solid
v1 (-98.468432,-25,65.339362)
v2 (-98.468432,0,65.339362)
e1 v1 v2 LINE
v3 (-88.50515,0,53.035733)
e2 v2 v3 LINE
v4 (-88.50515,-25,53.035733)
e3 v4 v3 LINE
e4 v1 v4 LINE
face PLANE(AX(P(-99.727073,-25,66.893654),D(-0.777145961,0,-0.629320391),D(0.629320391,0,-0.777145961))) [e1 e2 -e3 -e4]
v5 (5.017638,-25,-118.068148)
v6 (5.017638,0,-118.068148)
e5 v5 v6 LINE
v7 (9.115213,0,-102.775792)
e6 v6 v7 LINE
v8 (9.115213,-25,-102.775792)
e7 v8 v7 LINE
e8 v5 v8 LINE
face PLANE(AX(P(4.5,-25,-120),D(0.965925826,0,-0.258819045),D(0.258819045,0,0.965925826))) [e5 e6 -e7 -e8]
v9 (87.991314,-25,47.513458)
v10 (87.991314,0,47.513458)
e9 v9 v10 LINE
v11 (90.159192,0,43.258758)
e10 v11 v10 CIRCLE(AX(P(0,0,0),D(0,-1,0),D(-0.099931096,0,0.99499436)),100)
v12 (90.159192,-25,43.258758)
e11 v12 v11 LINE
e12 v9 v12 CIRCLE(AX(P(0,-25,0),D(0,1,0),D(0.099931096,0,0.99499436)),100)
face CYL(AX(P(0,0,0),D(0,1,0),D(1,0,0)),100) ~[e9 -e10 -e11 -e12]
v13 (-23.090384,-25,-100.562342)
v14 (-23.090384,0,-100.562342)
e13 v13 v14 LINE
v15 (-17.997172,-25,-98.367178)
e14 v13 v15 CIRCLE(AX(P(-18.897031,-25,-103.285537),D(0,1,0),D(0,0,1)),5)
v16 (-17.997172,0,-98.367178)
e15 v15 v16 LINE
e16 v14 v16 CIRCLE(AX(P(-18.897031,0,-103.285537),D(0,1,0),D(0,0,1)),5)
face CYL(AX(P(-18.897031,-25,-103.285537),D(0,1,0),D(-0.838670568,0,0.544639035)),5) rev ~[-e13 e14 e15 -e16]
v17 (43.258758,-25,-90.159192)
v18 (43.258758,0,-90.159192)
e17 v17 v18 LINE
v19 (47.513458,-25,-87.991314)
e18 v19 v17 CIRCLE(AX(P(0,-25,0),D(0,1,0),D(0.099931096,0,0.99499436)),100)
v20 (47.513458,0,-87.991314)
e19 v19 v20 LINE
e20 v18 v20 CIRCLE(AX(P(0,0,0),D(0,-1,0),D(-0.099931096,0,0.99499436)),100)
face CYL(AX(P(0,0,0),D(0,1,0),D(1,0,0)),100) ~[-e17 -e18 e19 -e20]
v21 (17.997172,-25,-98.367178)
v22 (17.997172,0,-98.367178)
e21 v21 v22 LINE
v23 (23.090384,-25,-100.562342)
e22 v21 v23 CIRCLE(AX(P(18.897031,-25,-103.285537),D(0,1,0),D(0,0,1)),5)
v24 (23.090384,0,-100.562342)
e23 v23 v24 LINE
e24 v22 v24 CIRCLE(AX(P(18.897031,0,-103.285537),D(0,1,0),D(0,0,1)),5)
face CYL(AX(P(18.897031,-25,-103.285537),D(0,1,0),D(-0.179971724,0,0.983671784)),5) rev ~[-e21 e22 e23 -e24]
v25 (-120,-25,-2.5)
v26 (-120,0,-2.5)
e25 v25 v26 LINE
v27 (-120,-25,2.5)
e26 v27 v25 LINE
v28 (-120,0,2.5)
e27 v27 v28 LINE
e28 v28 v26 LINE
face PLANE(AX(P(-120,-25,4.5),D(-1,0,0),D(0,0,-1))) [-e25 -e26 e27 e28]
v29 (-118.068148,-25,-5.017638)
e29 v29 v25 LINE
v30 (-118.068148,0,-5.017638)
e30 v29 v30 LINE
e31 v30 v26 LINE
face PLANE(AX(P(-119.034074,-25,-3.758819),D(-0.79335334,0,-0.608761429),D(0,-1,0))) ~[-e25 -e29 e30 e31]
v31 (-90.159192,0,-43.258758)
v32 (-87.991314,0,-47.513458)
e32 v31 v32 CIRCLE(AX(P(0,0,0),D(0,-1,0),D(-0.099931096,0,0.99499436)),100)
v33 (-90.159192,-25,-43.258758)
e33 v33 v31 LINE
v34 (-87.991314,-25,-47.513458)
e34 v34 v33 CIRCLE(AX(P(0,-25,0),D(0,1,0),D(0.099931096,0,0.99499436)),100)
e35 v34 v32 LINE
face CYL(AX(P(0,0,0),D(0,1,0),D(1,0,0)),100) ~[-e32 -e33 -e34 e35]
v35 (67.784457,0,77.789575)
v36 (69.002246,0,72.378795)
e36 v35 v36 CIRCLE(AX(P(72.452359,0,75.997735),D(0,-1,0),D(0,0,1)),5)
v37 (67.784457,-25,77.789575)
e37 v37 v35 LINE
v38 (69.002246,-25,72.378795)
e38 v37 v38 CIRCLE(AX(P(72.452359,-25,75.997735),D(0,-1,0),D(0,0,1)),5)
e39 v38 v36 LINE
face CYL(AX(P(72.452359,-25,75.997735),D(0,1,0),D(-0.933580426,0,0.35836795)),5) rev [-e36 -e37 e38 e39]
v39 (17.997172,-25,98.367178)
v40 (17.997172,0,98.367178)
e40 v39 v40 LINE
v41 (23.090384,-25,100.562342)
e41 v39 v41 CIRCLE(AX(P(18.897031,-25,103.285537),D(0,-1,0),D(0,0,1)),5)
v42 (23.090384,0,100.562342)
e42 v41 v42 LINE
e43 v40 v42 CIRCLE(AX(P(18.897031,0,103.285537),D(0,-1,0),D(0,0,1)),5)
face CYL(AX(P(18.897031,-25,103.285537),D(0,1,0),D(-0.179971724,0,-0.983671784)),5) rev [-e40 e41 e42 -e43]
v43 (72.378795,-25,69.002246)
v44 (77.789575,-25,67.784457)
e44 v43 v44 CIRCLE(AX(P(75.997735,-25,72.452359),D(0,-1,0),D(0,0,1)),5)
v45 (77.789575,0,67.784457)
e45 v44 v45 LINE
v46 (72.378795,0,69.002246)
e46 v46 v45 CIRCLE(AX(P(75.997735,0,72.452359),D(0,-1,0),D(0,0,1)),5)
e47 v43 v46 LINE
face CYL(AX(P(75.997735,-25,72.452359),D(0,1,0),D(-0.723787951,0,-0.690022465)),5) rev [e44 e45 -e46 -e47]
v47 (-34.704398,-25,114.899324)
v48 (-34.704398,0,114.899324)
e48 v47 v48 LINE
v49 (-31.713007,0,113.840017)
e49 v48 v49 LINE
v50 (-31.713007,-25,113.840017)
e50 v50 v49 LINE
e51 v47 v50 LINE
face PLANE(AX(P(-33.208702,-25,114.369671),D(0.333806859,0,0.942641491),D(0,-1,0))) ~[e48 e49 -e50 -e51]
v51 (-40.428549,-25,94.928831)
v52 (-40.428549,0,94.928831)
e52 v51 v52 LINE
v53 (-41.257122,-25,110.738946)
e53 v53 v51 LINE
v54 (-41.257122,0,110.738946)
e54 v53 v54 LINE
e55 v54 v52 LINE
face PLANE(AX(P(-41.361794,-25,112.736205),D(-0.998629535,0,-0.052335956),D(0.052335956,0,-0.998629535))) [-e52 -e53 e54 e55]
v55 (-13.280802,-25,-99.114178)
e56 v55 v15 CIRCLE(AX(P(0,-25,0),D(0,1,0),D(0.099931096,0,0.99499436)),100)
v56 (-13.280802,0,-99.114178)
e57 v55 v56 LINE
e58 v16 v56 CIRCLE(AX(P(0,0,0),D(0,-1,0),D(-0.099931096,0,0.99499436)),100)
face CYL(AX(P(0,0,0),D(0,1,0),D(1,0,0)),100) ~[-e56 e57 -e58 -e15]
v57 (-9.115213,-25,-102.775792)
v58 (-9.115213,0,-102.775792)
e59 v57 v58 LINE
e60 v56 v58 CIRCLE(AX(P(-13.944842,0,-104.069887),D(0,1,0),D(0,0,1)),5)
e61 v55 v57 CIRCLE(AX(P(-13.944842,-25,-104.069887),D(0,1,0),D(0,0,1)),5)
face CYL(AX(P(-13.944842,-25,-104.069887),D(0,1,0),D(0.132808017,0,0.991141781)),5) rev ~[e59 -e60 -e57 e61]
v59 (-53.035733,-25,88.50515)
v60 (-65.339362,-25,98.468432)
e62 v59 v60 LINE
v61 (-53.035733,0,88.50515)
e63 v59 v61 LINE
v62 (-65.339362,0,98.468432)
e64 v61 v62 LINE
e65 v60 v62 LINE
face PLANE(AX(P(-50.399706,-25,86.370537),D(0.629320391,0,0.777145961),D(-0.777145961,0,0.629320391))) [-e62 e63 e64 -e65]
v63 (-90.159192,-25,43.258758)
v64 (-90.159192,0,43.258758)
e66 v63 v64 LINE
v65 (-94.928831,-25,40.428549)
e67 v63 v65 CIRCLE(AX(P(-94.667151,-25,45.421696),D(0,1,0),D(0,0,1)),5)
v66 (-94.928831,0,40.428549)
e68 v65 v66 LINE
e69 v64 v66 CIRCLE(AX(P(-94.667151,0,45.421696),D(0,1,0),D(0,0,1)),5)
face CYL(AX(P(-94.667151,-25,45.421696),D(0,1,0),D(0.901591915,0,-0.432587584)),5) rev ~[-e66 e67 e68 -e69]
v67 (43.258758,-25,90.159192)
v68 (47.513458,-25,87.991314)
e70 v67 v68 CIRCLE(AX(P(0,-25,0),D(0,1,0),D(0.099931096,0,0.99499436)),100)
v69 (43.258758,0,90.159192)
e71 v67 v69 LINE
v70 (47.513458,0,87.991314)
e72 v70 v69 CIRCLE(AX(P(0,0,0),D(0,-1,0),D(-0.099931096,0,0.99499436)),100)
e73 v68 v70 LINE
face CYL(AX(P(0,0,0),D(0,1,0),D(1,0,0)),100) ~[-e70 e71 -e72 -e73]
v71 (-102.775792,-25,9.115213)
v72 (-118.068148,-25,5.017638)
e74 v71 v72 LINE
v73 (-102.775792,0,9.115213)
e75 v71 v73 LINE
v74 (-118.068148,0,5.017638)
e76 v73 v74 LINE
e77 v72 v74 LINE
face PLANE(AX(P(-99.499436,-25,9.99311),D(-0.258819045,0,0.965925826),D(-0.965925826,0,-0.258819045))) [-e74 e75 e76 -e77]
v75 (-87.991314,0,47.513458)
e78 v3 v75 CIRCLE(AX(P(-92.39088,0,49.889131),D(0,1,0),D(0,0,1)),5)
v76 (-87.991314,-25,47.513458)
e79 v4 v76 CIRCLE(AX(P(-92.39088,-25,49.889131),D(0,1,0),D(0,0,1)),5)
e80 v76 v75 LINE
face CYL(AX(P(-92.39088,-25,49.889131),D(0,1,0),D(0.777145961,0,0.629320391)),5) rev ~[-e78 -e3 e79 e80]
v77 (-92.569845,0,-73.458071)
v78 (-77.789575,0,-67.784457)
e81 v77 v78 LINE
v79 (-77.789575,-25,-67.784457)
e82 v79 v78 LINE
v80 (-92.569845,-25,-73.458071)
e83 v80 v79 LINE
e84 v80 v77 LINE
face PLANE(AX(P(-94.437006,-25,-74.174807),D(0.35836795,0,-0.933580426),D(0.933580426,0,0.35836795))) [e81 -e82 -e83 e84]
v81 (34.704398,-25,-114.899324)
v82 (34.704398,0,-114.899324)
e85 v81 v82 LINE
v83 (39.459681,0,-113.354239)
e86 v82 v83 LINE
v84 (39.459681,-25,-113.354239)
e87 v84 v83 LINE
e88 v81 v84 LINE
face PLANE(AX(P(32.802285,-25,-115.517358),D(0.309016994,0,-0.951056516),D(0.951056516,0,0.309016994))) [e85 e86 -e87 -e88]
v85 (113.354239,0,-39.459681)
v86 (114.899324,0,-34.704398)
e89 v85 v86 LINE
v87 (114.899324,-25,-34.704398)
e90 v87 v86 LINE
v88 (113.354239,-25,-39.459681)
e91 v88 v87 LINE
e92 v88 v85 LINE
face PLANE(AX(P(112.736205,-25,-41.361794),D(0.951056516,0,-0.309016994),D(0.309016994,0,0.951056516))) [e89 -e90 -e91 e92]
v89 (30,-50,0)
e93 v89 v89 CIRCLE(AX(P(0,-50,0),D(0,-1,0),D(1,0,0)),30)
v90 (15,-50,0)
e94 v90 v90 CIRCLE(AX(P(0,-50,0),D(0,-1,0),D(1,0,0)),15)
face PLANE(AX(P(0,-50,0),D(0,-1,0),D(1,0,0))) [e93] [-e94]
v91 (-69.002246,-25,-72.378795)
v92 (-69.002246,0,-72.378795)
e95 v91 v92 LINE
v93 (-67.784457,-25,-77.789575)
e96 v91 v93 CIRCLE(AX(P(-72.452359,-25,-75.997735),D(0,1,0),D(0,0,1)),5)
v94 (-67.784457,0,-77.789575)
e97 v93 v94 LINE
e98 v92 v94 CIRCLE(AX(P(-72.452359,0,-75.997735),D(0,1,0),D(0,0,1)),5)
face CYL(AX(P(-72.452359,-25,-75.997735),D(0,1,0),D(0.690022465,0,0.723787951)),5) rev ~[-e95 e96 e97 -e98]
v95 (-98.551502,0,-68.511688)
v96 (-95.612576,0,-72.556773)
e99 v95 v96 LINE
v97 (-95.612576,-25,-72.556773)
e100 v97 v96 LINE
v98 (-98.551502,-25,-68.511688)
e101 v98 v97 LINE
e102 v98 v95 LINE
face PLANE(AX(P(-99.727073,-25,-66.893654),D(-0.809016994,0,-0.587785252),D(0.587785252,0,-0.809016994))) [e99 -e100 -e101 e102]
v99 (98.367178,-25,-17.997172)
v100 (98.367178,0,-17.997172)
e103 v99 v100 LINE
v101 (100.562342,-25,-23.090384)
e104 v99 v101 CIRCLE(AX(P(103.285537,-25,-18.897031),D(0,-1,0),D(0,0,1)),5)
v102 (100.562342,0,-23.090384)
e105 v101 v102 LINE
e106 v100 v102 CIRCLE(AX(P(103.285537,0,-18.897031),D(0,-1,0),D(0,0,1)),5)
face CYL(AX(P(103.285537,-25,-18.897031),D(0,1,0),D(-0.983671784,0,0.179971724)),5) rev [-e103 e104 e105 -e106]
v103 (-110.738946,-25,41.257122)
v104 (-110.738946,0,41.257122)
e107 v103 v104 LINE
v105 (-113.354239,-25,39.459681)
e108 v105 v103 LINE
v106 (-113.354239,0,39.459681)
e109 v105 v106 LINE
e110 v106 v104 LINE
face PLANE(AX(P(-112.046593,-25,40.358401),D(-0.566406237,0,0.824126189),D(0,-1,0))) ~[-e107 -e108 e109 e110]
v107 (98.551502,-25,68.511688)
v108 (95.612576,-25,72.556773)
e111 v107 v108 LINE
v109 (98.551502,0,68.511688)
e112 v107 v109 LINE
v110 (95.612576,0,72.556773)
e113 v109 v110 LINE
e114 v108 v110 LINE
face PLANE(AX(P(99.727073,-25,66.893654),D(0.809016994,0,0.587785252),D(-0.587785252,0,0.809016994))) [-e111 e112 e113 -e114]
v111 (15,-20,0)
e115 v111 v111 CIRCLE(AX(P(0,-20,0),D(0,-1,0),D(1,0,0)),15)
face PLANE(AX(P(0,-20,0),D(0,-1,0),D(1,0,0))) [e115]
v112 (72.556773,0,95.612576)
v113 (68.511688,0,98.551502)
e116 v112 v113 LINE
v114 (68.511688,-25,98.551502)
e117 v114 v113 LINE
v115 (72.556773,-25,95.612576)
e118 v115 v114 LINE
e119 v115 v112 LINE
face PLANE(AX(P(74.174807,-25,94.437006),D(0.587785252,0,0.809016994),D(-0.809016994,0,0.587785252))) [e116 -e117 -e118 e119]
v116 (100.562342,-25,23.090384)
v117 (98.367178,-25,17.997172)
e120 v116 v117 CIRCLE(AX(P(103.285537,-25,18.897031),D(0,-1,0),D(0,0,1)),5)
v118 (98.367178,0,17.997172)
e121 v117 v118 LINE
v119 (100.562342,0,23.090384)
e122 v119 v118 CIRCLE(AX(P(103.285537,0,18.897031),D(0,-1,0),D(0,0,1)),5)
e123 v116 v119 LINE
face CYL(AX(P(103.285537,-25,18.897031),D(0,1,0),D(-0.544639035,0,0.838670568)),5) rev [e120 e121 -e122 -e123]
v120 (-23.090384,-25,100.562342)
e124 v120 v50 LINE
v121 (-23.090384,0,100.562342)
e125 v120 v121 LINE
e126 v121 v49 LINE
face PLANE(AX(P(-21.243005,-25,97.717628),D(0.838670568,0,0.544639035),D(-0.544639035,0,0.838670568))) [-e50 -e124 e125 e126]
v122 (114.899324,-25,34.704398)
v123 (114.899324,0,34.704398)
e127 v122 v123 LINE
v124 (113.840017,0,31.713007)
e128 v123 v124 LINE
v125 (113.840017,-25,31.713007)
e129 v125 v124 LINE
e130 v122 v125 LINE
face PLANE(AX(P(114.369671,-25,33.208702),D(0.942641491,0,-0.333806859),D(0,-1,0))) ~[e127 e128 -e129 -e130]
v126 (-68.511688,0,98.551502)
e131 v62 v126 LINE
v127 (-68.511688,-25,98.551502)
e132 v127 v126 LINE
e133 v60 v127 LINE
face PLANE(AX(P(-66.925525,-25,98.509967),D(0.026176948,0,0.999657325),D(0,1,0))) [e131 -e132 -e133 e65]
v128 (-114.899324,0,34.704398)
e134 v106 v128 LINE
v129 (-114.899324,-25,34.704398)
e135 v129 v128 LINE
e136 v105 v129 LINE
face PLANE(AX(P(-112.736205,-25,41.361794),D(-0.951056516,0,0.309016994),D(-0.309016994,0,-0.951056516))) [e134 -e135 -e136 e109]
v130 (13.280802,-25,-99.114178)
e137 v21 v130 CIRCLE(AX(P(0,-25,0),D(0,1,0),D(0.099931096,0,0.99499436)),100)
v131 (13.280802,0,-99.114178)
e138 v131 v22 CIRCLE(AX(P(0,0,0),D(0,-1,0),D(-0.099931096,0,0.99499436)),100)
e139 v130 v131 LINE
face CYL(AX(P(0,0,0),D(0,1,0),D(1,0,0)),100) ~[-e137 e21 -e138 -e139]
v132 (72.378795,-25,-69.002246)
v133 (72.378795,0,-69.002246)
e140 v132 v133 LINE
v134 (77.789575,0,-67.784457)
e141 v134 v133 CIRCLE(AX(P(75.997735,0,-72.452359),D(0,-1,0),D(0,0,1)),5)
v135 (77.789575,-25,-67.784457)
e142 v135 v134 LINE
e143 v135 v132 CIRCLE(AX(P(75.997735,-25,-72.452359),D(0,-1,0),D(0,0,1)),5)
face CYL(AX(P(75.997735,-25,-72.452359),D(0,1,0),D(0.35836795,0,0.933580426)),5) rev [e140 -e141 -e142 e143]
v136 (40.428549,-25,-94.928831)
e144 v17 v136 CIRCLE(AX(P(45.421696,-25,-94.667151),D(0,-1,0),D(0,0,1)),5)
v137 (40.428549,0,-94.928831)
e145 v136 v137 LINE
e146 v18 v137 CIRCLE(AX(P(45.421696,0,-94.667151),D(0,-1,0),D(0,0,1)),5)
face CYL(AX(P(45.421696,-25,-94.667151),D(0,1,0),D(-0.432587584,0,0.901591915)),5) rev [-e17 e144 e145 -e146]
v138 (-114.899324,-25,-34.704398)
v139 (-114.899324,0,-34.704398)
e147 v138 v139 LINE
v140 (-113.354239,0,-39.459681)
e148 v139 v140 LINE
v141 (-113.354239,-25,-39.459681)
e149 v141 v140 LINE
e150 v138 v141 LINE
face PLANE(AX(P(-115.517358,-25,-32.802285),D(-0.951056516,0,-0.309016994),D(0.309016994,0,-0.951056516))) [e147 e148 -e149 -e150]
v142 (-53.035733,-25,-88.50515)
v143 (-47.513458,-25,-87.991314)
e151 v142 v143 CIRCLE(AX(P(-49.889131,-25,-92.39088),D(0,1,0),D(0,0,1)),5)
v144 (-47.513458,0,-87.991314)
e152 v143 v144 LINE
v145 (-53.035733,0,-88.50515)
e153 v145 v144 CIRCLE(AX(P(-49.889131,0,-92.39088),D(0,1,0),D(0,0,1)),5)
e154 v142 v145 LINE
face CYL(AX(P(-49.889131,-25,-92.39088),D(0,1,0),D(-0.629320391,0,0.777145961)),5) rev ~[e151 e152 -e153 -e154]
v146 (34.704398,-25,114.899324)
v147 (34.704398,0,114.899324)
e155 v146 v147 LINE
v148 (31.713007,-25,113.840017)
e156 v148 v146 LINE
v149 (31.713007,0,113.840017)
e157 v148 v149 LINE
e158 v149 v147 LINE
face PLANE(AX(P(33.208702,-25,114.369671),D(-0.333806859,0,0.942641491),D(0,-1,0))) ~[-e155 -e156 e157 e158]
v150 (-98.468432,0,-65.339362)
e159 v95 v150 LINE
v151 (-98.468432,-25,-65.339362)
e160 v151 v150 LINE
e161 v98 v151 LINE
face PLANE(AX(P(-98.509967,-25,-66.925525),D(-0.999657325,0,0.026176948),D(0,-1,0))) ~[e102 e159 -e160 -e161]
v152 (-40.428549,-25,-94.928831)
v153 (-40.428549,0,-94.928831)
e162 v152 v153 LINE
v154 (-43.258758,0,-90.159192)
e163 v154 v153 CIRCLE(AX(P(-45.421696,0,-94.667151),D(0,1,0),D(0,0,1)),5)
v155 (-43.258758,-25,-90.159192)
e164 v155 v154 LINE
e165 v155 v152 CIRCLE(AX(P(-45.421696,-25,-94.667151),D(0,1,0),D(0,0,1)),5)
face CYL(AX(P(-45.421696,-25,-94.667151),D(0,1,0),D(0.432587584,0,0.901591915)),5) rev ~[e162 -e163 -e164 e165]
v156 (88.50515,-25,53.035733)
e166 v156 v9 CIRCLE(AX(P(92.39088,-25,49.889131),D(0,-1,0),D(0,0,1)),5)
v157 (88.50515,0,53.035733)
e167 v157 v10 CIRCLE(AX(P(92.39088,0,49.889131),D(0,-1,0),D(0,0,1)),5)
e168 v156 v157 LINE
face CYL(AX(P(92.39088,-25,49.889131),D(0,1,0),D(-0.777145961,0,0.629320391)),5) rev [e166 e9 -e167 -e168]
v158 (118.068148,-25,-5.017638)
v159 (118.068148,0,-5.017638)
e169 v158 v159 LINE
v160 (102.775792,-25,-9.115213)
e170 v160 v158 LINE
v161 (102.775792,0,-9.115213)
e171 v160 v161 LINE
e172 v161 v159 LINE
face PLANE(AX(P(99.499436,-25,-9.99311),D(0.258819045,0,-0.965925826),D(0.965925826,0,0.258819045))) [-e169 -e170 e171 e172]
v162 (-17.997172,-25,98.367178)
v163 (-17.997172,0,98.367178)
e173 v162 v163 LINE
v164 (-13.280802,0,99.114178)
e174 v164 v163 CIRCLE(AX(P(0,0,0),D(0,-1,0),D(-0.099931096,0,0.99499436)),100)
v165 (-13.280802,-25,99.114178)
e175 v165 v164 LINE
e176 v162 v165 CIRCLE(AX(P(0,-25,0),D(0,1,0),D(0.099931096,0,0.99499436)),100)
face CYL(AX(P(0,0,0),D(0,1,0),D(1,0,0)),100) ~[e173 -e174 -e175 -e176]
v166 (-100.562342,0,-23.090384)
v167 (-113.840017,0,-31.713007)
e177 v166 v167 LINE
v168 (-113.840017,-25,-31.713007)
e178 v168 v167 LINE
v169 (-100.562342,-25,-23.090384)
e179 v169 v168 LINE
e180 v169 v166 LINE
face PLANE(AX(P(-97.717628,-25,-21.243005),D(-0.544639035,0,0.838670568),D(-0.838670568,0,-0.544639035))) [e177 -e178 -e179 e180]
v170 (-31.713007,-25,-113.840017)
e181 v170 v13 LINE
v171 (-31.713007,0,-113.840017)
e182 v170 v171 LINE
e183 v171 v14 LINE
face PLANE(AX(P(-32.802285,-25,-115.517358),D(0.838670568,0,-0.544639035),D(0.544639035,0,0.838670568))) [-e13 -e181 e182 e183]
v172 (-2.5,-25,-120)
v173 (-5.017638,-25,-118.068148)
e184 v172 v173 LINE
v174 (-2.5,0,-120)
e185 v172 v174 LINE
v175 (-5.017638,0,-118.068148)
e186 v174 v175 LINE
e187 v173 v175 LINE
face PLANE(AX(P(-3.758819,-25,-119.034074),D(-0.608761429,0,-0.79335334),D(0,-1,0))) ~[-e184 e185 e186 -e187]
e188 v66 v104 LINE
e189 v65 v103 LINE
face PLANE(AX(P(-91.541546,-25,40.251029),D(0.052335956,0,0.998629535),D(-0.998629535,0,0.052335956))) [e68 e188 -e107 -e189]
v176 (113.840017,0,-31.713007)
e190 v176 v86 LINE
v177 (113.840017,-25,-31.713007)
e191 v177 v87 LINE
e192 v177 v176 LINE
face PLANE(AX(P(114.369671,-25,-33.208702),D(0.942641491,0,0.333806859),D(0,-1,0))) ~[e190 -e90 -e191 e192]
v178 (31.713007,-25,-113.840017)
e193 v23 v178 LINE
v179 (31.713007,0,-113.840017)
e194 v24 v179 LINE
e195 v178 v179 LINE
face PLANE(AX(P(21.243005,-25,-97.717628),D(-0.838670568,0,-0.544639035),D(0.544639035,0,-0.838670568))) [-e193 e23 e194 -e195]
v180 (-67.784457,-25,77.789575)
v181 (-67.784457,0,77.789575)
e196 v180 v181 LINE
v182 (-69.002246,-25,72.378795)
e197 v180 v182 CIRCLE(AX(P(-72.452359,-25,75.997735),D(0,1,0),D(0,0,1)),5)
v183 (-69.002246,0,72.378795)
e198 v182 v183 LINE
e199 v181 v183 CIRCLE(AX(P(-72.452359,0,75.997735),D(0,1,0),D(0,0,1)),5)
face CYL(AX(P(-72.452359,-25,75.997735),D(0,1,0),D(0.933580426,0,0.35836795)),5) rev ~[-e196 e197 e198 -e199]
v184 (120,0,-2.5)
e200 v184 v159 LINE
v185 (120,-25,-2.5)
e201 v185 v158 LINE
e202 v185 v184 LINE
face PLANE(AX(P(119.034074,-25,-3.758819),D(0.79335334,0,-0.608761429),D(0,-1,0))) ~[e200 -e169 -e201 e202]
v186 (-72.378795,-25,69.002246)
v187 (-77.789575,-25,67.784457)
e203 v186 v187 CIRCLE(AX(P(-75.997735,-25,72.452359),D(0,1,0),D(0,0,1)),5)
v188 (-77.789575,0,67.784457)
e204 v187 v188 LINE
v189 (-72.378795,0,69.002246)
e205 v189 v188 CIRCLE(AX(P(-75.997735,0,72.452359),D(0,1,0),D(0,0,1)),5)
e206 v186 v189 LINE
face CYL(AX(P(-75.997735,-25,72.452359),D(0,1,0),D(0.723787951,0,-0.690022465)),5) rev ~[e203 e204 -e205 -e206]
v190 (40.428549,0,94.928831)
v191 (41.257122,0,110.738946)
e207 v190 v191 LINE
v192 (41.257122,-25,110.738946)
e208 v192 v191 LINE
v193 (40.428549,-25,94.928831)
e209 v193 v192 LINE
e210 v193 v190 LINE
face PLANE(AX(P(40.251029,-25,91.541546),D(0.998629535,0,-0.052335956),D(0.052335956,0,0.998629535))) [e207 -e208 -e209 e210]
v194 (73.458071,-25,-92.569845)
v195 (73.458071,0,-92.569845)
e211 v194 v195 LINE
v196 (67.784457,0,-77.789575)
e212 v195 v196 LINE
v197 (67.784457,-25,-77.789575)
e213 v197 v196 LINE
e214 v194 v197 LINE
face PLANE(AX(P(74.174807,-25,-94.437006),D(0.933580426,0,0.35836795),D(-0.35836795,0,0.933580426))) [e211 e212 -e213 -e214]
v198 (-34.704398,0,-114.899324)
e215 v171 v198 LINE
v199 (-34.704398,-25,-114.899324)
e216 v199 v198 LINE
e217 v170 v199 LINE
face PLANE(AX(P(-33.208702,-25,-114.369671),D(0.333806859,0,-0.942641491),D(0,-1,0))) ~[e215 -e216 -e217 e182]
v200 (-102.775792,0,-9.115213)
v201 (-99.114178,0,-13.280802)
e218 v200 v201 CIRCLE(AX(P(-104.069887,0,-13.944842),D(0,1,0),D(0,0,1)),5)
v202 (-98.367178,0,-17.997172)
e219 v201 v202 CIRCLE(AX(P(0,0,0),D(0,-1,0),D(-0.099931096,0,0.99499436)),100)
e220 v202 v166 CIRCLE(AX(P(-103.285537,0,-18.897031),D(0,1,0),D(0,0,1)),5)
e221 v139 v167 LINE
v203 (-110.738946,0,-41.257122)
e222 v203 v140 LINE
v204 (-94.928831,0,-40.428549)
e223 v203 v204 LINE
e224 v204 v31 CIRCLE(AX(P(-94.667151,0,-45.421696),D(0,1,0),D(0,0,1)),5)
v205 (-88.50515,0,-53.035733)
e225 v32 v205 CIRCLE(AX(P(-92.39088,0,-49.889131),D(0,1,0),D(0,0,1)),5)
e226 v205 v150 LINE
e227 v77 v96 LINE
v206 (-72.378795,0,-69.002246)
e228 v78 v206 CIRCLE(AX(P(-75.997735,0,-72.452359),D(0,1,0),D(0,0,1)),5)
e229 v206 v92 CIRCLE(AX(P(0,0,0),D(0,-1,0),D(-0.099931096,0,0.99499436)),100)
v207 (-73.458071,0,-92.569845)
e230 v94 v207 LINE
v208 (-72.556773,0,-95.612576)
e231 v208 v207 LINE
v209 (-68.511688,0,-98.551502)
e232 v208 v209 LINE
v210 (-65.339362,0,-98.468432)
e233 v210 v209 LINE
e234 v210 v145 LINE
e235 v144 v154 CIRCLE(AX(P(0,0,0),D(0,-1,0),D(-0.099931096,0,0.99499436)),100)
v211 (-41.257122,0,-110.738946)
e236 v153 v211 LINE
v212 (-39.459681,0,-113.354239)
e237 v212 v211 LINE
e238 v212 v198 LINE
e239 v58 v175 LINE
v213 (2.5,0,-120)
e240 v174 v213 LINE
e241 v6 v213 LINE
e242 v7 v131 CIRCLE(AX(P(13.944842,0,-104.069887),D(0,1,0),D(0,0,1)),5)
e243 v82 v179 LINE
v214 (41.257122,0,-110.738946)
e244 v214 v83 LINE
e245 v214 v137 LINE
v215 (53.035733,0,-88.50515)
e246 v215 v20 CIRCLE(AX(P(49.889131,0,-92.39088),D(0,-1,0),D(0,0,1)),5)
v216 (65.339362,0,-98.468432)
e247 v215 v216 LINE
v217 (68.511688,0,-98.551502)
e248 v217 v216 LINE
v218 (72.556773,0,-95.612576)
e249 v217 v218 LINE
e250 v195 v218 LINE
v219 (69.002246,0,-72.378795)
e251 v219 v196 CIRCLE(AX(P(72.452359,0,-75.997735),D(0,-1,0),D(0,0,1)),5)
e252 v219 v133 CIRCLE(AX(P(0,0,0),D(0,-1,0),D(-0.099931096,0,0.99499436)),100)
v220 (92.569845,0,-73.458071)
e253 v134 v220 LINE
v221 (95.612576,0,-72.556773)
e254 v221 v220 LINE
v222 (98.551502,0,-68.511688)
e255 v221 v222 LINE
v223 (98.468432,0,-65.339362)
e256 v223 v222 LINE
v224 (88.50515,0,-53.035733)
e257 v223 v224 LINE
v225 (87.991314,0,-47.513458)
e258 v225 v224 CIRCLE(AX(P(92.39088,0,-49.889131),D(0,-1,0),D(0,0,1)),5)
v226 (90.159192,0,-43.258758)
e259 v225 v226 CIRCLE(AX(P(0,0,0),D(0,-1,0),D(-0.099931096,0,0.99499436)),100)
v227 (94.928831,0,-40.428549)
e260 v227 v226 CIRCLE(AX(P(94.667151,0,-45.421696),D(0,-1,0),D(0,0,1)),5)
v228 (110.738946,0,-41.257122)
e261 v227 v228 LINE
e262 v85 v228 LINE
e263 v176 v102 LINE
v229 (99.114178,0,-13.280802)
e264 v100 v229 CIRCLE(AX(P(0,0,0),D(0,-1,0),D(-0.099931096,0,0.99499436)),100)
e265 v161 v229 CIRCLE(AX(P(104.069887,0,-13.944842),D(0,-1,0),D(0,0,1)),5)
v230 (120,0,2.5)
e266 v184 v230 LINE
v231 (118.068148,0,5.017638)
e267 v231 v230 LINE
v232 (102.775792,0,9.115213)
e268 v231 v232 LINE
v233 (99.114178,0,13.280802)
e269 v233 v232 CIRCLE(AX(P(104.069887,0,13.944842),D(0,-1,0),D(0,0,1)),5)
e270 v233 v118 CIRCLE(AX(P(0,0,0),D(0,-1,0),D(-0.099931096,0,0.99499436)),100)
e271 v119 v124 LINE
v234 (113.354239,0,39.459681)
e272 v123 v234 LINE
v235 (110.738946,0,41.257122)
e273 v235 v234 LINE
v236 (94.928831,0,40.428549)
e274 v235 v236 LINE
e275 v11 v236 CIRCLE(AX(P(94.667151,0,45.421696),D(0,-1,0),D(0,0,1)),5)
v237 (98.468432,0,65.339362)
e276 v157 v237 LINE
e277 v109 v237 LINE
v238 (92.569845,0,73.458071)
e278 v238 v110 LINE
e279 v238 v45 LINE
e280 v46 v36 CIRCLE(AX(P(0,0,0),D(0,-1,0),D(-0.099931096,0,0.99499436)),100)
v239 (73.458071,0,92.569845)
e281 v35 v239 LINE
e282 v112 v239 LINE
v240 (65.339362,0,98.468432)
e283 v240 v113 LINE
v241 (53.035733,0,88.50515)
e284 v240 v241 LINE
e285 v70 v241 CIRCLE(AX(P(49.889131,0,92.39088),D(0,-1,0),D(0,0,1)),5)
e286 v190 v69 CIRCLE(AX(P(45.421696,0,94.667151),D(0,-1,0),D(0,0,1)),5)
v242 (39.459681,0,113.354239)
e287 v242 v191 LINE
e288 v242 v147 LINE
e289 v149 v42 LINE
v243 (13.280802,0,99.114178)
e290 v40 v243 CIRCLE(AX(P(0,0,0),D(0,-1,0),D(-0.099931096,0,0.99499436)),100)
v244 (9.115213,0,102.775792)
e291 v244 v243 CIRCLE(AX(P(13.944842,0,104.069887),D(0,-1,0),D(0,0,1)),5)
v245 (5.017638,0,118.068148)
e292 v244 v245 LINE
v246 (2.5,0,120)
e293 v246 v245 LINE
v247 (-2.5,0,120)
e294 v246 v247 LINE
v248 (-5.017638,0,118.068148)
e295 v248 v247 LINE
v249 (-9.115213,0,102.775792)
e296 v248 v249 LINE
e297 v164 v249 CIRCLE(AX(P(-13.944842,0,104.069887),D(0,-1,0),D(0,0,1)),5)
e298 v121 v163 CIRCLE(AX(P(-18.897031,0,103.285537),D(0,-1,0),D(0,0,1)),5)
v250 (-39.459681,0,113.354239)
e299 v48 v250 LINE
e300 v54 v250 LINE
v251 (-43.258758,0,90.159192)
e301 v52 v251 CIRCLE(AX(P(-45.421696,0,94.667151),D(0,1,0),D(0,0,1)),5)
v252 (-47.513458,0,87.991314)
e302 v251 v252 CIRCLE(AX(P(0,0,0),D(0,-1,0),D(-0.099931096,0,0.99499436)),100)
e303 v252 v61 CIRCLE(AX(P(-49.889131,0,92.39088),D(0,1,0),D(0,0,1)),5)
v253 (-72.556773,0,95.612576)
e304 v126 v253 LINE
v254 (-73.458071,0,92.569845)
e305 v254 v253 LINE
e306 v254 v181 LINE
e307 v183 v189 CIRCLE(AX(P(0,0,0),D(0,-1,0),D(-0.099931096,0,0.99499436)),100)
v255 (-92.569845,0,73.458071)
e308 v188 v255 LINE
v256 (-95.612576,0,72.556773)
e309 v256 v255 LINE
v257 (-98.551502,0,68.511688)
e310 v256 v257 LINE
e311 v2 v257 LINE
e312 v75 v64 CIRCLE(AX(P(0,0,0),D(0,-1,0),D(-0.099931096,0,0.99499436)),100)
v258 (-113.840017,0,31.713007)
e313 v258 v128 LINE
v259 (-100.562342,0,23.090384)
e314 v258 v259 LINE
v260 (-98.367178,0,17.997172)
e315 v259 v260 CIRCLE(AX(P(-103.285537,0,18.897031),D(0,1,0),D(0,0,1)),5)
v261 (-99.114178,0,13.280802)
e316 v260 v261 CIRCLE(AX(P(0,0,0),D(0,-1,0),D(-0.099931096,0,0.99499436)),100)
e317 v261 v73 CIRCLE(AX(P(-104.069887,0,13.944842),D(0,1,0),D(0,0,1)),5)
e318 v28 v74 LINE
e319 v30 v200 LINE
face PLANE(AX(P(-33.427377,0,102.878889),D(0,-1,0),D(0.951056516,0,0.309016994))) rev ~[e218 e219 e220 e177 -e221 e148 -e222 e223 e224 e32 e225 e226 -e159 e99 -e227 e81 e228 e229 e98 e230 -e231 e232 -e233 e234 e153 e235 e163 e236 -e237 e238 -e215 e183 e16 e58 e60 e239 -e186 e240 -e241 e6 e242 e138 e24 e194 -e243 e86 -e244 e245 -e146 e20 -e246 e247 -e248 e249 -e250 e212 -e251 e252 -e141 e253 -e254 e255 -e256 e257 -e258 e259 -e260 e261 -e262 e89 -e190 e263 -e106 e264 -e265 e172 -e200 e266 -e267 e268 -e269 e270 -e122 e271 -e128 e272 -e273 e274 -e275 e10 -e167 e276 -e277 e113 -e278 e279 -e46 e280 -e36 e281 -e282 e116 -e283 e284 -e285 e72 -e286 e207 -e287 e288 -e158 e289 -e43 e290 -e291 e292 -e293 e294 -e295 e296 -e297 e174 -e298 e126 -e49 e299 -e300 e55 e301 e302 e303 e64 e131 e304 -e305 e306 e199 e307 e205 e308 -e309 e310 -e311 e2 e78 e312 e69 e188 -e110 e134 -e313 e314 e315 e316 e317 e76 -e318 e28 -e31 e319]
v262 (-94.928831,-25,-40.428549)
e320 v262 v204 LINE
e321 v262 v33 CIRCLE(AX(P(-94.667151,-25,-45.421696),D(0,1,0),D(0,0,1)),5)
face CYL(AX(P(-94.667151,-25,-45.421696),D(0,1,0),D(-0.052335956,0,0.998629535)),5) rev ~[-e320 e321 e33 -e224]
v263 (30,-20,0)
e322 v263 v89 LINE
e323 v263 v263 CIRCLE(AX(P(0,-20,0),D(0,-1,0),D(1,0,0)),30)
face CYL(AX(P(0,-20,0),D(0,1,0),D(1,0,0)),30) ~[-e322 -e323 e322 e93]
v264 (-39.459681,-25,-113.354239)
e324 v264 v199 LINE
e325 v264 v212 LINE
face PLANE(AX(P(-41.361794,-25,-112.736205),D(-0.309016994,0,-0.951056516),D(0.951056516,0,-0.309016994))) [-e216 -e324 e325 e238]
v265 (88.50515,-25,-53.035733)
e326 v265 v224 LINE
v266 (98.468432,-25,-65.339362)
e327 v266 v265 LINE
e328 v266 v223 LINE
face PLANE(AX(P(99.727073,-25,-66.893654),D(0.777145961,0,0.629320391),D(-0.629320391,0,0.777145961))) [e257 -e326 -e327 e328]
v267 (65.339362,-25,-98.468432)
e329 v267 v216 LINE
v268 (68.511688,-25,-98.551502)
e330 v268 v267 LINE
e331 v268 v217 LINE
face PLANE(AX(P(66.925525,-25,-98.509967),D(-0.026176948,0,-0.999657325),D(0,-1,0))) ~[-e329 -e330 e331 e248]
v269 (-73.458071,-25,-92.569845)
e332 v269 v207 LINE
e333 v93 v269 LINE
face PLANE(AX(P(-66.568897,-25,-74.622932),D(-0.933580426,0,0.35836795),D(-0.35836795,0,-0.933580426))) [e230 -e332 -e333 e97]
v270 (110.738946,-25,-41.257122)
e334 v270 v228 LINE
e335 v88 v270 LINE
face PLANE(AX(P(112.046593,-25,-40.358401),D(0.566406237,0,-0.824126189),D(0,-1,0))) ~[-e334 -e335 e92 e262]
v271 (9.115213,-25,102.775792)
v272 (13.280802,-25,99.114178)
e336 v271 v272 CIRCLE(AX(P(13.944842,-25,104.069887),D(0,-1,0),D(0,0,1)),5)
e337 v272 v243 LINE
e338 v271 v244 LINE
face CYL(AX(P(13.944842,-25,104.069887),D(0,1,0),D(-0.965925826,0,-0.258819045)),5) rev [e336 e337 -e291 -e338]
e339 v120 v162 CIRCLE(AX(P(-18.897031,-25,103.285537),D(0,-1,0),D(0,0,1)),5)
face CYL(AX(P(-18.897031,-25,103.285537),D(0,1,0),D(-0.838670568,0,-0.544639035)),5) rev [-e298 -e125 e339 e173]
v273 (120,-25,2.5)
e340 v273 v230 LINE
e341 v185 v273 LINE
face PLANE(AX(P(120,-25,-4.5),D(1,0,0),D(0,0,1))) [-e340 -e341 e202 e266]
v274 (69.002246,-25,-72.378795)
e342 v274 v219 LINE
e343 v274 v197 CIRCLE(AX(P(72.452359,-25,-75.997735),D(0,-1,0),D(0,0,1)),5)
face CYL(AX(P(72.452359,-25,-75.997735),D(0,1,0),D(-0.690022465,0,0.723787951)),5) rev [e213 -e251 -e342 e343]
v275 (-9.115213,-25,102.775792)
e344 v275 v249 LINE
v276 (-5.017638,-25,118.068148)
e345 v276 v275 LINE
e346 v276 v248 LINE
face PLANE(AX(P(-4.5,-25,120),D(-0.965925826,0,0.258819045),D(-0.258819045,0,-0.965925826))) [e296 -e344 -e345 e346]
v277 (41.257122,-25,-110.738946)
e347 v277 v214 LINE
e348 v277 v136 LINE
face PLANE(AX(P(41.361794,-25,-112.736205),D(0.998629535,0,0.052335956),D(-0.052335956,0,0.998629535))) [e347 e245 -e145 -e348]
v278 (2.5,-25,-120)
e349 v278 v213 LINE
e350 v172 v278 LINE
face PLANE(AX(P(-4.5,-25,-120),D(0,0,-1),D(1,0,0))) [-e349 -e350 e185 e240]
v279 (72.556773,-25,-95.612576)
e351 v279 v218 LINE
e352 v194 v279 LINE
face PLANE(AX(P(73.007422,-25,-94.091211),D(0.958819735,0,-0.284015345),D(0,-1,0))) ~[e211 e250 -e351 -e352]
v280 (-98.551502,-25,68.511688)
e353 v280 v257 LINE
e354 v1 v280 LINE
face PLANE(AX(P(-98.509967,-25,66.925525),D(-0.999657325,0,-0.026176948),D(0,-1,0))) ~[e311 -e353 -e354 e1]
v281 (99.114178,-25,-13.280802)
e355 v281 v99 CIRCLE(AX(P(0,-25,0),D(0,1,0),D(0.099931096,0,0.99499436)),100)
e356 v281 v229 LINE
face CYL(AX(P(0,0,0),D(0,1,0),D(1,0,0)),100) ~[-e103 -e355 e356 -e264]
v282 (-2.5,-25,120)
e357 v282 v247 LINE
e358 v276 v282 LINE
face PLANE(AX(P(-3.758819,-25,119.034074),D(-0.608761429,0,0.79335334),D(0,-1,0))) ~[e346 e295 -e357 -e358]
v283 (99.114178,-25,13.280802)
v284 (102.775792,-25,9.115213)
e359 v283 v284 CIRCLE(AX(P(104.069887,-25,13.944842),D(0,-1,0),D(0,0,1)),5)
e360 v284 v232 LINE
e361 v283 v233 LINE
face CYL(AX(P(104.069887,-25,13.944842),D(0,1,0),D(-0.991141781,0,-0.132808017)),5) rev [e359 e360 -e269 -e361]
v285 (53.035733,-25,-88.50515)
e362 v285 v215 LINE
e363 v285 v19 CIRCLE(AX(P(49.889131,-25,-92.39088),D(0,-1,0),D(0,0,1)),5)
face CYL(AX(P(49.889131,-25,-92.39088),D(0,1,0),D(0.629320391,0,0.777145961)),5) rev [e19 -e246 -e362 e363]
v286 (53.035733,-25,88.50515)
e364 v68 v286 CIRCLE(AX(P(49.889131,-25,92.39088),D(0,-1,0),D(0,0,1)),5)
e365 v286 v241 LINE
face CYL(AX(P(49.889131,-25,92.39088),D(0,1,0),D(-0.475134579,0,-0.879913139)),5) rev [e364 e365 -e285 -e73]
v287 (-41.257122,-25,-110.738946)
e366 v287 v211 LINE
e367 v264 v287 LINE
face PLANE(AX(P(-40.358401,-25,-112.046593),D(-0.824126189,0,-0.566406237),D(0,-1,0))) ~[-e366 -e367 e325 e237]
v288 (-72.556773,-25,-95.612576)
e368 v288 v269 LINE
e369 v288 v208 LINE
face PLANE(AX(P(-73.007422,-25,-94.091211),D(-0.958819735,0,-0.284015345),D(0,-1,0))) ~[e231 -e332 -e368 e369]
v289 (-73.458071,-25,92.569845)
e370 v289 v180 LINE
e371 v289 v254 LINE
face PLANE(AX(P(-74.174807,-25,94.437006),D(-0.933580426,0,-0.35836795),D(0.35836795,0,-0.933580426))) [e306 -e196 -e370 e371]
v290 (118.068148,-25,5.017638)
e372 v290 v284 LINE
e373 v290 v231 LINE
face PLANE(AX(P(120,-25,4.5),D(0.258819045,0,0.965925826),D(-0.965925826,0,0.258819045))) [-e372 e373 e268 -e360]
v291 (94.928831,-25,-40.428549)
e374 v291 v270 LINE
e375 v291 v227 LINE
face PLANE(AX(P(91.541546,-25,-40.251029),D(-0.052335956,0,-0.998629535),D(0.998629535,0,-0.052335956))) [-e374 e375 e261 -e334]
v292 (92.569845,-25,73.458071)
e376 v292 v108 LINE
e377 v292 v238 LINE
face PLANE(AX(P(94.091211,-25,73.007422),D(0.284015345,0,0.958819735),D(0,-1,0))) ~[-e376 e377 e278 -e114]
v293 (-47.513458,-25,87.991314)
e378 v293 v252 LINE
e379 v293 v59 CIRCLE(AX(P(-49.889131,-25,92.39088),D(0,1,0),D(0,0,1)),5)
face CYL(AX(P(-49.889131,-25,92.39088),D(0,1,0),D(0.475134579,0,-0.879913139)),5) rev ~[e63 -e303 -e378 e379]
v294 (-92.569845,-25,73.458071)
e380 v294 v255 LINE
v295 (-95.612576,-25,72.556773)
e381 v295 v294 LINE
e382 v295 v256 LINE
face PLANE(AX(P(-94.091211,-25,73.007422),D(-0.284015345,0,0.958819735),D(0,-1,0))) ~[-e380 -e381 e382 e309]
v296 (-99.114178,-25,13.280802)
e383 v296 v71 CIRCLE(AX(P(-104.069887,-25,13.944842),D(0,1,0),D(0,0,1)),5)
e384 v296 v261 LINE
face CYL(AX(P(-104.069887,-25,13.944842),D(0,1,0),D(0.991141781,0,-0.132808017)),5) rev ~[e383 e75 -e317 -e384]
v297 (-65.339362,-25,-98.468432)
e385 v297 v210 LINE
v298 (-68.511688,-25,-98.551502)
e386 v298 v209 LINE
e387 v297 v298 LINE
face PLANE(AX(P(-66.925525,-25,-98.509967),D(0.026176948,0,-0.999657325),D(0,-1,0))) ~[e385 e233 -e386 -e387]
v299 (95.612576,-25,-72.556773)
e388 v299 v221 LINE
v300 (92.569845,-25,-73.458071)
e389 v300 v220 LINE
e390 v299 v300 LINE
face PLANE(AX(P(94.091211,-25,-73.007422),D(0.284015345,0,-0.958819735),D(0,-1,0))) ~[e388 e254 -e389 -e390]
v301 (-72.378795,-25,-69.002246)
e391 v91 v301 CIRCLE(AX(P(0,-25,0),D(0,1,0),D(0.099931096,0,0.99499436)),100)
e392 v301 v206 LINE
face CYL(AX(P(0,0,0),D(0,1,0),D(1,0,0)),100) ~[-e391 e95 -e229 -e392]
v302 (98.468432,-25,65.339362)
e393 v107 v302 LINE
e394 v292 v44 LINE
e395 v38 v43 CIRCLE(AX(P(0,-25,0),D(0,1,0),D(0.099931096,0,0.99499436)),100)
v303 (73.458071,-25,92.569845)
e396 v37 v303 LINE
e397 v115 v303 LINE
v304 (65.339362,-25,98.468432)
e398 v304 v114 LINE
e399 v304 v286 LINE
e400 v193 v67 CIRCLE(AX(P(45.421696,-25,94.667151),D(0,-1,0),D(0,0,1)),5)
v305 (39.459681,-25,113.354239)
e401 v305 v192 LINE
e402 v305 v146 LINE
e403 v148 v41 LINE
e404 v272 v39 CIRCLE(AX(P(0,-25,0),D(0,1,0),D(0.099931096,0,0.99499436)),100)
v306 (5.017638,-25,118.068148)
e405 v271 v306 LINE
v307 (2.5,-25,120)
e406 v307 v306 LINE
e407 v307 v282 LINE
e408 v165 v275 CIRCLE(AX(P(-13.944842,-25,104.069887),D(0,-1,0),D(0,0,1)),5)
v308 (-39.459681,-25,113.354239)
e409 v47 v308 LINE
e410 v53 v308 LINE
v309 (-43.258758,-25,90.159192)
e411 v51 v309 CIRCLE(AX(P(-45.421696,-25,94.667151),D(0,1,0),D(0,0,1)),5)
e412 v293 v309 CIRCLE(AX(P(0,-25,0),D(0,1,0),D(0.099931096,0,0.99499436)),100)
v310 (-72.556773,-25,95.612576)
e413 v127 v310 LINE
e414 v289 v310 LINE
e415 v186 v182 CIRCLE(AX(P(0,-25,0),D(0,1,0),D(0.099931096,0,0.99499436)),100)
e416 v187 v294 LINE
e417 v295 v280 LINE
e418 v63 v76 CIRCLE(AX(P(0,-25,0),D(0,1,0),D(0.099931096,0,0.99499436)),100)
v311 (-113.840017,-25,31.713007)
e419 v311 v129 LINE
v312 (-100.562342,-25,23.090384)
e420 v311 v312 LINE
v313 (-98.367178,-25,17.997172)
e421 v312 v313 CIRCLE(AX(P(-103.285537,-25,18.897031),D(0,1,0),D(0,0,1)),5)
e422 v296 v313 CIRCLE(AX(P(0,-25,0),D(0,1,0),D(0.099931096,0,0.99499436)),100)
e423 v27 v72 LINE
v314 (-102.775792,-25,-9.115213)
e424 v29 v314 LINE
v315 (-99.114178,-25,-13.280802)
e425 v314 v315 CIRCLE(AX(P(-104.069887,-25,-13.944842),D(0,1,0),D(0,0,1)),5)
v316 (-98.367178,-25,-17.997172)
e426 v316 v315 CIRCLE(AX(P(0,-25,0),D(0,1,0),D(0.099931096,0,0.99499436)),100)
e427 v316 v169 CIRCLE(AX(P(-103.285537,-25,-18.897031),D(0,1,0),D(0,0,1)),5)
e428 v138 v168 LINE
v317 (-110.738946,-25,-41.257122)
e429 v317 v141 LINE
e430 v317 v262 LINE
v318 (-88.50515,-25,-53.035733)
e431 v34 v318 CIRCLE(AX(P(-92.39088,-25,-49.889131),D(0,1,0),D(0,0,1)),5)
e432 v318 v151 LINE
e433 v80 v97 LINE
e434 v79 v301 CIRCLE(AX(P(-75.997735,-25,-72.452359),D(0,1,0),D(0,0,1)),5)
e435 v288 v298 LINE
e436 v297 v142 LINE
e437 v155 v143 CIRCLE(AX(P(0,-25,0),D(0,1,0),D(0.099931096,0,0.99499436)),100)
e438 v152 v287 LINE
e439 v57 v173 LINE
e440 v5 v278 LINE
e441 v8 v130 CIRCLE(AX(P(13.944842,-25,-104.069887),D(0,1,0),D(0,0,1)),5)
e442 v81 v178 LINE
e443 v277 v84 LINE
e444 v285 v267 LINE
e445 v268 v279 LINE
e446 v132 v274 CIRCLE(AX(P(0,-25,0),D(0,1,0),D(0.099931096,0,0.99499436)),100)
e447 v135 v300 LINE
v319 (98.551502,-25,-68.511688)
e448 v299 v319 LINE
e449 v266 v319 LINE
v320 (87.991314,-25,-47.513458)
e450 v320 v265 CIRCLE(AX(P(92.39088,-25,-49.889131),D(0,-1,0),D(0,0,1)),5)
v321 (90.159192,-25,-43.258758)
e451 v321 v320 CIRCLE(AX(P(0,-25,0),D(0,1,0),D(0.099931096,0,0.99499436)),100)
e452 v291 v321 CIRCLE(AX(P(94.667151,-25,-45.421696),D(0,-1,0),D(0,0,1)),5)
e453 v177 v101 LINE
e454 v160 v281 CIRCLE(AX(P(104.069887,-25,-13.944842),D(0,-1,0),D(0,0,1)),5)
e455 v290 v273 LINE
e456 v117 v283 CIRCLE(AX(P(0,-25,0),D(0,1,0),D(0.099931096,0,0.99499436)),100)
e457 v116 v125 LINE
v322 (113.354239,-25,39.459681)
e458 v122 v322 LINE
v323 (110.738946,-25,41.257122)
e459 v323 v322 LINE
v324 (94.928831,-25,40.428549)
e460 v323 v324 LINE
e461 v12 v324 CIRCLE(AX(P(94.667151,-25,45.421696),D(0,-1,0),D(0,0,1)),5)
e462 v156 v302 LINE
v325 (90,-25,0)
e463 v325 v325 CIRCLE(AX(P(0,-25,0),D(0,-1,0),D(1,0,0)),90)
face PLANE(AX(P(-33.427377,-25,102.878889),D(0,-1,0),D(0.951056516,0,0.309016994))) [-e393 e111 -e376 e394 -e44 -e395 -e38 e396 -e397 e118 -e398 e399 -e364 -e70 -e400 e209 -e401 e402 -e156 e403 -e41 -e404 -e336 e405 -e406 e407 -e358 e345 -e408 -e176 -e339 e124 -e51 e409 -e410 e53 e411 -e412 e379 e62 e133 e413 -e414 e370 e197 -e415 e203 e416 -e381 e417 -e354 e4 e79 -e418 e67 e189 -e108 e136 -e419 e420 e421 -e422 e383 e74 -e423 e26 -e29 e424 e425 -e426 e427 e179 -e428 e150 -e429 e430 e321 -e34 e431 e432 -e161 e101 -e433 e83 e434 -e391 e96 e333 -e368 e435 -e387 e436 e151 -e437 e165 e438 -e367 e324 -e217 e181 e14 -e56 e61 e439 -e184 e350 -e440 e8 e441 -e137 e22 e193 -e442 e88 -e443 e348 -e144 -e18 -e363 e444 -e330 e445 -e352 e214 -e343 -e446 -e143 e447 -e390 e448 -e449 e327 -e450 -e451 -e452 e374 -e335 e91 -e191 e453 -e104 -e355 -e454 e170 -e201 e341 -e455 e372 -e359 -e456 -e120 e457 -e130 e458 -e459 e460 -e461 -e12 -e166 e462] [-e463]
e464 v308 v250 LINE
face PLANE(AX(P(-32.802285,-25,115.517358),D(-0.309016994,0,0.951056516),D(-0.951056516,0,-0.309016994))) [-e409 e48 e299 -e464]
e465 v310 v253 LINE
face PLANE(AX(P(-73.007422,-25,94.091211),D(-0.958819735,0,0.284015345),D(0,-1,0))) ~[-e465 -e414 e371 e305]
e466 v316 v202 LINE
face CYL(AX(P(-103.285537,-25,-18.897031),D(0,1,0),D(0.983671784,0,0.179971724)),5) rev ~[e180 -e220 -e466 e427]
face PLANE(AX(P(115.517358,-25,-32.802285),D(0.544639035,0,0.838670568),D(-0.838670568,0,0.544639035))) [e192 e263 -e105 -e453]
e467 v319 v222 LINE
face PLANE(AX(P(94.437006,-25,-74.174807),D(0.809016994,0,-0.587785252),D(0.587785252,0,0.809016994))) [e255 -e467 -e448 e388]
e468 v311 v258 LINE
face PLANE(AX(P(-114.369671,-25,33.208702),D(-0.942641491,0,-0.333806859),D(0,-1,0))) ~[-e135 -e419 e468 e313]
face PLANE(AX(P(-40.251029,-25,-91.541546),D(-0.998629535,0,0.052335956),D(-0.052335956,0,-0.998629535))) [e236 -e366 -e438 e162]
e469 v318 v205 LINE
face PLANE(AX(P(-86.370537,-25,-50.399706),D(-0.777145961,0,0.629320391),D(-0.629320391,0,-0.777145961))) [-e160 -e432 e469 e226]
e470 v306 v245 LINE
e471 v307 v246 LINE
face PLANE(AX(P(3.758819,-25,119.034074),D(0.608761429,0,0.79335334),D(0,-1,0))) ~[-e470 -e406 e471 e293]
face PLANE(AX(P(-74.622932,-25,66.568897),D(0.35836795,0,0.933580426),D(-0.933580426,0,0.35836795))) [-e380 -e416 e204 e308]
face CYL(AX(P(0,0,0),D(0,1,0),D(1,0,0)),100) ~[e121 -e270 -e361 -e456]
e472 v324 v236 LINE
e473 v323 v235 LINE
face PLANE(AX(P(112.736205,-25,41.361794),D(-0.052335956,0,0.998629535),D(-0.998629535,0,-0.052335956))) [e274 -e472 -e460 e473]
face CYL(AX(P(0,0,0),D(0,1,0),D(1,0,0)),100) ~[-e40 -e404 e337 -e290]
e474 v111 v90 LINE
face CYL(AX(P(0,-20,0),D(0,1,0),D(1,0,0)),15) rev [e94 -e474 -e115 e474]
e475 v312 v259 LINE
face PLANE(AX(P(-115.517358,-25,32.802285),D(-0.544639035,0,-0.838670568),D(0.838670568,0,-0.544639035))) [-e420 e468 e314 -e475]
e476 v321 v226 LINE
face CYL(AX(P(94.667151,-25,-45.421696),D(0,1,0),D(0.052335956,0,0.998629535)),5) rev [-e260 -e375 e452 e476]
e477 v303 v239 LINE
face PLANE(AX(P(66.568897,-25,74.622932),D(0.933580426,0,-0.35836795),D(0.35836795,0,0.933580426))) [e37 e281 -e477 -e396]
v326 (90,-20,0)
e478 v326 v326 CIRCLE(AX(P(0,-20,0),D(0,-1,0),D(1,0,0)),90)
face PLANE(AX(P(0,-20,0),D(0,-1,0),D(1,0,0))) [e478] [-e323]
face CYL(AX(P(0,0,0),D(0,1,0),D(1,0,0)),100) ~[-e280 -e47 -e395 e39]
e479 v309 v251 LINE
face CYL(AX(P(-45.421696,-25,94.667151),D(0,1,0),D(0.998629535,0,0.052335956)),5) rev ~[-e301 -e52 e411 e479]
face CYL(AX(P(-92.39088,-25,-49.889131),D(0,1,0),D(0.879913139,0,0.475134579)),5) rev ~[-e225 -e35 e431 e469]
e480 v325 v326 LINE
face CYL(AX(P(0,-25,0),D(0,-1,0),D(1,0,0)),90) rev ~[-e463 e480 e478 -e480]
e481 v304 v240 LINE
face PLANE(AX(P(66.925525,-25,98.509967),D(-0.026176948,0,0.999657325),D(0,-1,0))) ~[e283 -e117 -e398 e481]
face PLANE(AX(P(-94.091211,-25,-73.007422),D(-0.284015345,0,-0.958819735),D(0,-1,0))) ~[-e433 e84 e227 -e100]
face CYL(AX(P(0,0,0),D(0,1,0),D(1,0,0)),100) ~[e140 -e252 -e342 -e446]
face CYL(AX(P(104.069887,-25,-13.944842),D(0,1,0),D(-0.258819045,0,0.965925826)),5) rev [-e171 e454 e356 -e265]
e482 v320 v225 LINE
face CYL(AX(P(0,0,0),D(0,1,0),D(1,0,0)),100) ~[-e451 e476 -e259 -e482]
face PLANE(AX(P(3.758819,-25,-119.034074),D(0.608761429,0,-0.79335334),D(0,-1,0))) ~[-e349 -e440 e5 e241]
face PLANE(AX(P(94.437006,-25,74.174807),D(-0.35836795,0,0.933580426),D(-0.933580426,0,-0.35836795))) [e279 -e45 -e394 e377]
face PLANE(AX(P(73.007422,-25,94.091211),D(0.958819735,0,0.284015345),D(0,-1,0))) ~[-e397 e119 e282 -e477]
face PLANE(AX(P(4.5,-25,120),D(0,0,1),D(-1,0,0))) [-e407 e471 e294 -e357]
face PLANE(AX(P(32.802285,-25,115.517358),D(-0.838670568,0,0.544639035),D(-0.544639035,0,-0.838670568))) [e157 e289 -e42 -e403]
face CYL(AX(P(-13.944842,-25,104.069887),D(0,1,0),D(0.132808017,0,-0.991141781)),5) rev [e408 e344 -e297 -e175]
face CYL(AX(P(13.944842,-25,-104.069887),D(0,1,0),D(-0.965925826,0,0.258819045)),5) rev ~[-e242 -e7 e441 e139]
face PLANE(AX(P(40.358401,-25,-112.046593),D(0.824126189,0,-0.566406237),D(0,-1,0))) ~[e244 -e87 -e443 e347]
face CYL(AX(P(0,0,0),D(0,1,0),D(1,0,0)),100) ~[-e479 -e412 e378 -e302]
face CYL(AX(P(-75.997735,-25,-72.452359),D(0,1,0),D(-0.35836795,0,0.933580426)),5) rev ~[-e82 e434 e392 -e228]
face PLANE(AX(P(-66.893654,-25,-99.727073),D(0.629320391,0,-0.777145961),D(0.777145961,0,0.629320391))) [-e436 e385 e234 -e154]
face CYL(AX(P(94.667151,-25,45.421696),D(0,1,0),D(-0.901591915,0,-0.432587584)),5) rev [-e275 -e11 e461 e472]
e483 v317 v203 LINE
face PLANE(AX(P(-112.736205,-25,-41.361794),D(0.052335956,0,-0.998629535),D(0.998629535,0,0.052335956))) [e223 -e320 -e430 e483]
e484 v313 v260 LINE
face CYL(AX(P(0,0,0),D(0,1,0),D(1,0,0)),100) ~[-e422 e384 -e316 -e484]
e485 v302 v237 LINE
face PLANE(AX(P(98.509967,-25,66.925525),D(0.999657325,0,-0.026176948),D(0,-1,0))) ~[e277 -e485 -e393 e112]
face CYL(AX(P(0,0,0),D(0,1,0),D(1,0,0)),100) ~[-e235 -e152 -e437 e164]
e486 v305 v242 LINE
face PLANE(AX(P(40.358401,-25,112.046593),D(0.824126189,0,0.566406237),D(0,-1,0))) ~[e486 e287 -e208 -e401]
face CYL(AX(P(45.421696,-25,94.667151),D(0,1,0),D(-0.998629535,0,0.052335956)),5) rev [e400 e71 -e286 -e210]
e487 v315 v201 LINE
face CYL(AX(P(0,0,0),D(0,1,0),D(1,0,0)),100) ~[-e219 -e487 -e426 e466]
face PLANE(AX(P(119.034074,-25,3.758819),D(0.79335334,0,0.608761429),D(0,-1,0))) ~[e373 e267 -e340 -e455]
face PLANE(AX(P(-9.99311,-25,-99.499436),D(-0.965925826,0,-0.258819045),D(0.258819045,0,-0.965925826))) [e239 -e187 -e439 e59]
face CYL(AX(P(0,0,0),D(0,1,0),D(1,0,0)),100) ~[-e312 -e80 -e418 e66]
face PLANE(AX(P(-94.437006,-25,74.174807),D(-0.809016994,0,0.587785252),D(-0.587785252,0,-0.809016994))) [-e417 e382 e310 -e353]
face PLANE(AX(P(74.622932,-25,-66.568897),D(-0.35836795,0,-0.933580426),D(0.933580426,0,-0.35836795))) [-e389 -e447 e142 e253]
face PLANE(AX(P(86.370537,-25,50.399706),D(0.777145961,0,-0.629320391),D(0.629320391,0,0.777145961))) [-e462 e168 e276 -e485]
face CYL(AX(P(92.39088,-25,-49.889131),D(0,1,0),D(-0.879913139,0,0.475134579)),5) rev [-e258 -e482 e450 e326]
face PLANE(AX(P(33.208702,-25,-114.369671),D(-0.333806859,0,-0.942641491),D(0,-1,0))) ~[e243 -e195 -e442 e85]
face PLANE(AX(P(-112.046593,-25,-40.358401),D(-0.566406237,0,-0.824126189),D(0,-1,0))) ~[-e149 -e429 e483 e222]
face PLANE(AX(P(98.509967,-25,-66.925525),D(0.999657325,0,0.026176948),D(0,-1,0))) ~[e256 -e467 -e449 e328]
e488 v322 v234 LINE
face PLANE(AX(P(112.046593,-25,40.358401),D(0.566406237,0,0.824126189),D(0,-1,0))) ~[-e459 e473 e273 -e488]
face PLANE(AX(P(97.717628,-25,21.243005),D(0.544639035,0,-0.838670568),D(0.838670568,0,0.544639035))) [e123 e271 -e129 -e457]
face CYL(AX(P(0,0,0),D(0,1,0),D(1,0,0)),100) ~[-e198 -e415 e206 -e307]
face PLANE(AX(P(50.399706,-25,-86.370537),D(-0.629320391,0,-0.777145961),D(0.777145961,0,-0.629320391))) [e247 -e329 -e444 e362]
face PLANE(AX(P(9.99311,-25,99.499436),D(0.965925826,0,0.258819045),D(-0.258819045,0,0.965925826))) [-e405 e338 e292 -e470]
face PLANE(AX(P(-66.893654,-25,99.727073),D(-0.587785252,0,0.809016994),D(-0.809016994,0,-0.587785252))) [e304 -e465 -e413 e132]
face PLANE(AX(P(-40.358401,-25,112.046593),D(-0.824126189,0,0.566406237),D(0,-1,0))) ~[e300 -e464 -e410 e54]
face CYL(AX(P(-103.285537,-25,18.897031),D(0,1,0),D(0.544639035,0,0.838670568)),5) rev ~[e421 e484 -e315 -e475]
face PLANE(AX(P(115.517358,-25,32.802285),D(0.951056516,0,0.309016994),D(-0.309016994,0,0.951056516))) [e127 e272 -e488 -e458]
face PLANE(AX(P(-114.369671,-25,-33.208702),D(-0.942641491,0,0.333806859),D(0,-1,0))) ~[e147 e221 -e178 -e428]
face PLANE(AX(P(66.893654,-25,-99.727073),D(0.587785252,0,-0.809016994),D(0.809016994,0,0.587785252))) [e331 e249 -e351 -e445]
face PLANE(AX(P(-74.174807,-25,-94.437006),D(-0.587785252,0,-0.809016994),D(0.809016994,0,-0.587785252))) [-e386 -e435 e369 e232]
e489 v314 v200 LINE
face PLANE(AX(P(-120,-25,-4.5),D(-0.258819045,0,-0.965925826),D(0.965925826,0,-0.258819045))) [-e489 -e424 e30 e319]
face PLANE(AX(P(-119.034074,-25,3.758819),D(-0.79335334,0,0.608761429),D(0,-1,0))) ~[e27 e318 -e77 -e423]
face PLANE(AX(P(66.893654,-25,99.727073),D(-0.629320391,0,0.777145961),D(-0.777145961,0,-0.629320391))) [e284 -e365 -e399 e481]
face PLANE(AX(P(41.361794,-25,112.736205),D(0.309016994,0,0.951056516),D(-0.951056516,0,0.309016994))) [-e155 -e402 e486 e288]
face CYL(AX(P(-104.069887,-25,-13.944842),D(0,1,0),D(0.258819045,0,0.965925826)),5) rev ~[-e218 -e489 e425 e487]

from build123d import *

# Parameters (mm, degrees)
F0_R            = 100
F1_DEPTH        = 25
F3_DEPTH        = 25
F3_COPIES_COUNT = 20
F4_SIZE         = 2
F5_R            = 5
F6_R            = 90
F7_DEPTH        = 5
F8_R            = 30
F8_R_2          = 15
F9_DEPTH        = 30


# Not quite as in the source:
# - a pattern or mirror of a feature is missing from the dataset's text; its kind, count and spacing are read off the source's solid


with BuildPart() as f1:
    # F0 (on Front) → F1 (new body)
    with BuildSketch(Plane.XZ):
        Circle(F0_R)
    extrude(amount=F1_DEPTH)

    # F2 (on face) → F3 (join)
    with BuildSketch(Plane.XZ.offset(25)):
        Polygon((-4.5, 120), (-9.9931095726, 99.4994359837), (9.9931095726, 99.4994359837), (4.5, 120), align=None)
    f3 = extrude(amount=-F3_DEPTH)

    # F3_copies: F3 ×20 about axis
    f3_copies_axis = Axis((0, 0, 0), (0, 1, 0))
    for i in range(1, F3_COPIES_COUNT):
        add(f3.rotate(f3_copies_axis, i * 360 / F3_COPIES_COUNT))

    # F4
    f4_edges = [f1.edges().sort_by_distance(p)[0] for p in [
        (4.5, -12.5, 120),
        (-4.5, -12.5, 120),
        (-32.802285, -12.5, 115.517358),
        (115.517358, -12.5, 32.802285),
        (120, -12.5, 4.5),
        (120, -12.5, -4.5),
        (115.517358, -12.5, -32.802285),
        (112.736205, -12.5, -41.361794),
        (99.727073, -12.5, -66.893654),
        (94.437006, -12.5, -74.174807),
        (74.174807, -12.5, -94.437006),
        (66.893654, -12.5, -99.727073),
        (41.361794, -12.5, -112.736205),
        (32.802285, -12.5, -115.517358),
        (4.5, -12.5, -120),
        (-4.5, -12.5, -120),
        (-32.802285, -12.5, -115.517358),
        (-41.361794, -12.5, -112.736205),
        (-66.893654, -12.5, -99.727073),
        (-74.174807, -12.5, -94.437006),
        (-94.437006, -12.5, -74.174807),
        (-99.727073, -12.5, -66.893654),
        (-112.736205, -12.5, -41.361794),
        (-115.517358, -12.5, -32.802285),
        (-120, -12.5, -4.5),
        (-120, -12.5, 4.5),
        (-115.517358, -12.5, 32.802285),
        (-112.736205, -12.5, 41.361794),
        (-99.727073, -12.5, 66.893654),
        (-94.437006, -12.5, 74.174807),
        (-74.174807, -12.5, 94.437006),
        (-66.893654, -12.5, 99.727073),
        (32.802285, -12.5, 115.517358),
        (41.361794, -12.5, 112.736205),
        (66.893654, -12.5, 99.727073),
        (74.174807, -12.5, 94.437006),
        (94.437006, -12.5, 74.174807),
        (99.727073, -12.5, 66.893654),
        (112.736205, -12.5, 41.361794),
        (-41.361794, -12.5, 112.736205),
    ]]
    chamfer(f4_edges, length=F4_SIZE)

    # F5
    f5_edges = [f1.edges().sort_by_distance(p)[0] for p in [
        (9.99311, -12.5, 99.499436),
        (-9.99311, -12.5, 99.499436),
        (97.717628, -12.5, 21.243005),
        (99.499436, -12.5, 9.99311),
        (91.541546, -12.5, 40.251029),
        (86.370537, -12.5, 50.399706),
        (99.499436, -12.5, -9.99311),
        (97.717628, -12.5, -21.243005),
        (74.622932, -12.5, 66.568897),
        (66.568897, -12.5, 74.622932),
        (91.541546, -12.5, -40.251029),
        (86.370537, -12.5, -50.399706),
        (50.399706, -12.5, 86.370537),
        (40.251029, -12.5, 91.541546),
        (74.622932, -12.5, -66.568897),
        (66.568897, -12.5, -74.622932),
        (21.243005, -12.5, 97.717628),
        (50.399706, -12.5, -86.370537),
        (40.251029, -12.5, -91.541546),
        (-21.243005, -12.5, 97.717628),
        (21.243005, -12.5, -97.717628),
        (9.99311, -12.5, -99.499436),
        (-40.251029, -12.5, 91.541546),
        (-50.399706, -12.5, 86.370537),
        (-9.99311, -12.5, -99.499436),
        (-21.243005, -12.5, -97.717628),
        (-66.568897, -12.5, 74.622932),
        (-74.622932, -12.5, 66.568897),
        (-40.251029, -12.5, -91.541546),
        (-50.399706, -12.5, -86.370537),
        (-86.370537, -12.5, 50.399706),
        (-91.541546, -12.5, 40.251029),
        (-66.568897, -12.5, -74.622932),
        (-74.622932, -12.5, -66.568897),
        (-97.717628, -12.5, 21.243005),
        (-99.499436, -12.5, 9.99311),
        (-86.370537, -12.5, -50.399706),
        (-91.541546, -12.5, -40.251029),
        (-99.499436, -12.5, -9.99311),
        (-97.717628, -12.5, -21.243005),
    ]]
    fillet(f5_edges, radius=F5_R)

    # F6 (on face) → F7 (cut)
    with BuildSketch(Plane.XZ.offset(25)):
        Circle(F6_R)
    extrude(amount=-F7_DEPTH, mode=Mode.SUBTRACT)

    # F8 (on face) → F9 (join)
    with BuildSketch(Plane.XZ.offset(20)):
        Circle(F8_R)
        Circle(F8_R_2, mode=Mode.SUBTRACT)
    extrude(amount=F9_DEPTH)


solid = f1.part
